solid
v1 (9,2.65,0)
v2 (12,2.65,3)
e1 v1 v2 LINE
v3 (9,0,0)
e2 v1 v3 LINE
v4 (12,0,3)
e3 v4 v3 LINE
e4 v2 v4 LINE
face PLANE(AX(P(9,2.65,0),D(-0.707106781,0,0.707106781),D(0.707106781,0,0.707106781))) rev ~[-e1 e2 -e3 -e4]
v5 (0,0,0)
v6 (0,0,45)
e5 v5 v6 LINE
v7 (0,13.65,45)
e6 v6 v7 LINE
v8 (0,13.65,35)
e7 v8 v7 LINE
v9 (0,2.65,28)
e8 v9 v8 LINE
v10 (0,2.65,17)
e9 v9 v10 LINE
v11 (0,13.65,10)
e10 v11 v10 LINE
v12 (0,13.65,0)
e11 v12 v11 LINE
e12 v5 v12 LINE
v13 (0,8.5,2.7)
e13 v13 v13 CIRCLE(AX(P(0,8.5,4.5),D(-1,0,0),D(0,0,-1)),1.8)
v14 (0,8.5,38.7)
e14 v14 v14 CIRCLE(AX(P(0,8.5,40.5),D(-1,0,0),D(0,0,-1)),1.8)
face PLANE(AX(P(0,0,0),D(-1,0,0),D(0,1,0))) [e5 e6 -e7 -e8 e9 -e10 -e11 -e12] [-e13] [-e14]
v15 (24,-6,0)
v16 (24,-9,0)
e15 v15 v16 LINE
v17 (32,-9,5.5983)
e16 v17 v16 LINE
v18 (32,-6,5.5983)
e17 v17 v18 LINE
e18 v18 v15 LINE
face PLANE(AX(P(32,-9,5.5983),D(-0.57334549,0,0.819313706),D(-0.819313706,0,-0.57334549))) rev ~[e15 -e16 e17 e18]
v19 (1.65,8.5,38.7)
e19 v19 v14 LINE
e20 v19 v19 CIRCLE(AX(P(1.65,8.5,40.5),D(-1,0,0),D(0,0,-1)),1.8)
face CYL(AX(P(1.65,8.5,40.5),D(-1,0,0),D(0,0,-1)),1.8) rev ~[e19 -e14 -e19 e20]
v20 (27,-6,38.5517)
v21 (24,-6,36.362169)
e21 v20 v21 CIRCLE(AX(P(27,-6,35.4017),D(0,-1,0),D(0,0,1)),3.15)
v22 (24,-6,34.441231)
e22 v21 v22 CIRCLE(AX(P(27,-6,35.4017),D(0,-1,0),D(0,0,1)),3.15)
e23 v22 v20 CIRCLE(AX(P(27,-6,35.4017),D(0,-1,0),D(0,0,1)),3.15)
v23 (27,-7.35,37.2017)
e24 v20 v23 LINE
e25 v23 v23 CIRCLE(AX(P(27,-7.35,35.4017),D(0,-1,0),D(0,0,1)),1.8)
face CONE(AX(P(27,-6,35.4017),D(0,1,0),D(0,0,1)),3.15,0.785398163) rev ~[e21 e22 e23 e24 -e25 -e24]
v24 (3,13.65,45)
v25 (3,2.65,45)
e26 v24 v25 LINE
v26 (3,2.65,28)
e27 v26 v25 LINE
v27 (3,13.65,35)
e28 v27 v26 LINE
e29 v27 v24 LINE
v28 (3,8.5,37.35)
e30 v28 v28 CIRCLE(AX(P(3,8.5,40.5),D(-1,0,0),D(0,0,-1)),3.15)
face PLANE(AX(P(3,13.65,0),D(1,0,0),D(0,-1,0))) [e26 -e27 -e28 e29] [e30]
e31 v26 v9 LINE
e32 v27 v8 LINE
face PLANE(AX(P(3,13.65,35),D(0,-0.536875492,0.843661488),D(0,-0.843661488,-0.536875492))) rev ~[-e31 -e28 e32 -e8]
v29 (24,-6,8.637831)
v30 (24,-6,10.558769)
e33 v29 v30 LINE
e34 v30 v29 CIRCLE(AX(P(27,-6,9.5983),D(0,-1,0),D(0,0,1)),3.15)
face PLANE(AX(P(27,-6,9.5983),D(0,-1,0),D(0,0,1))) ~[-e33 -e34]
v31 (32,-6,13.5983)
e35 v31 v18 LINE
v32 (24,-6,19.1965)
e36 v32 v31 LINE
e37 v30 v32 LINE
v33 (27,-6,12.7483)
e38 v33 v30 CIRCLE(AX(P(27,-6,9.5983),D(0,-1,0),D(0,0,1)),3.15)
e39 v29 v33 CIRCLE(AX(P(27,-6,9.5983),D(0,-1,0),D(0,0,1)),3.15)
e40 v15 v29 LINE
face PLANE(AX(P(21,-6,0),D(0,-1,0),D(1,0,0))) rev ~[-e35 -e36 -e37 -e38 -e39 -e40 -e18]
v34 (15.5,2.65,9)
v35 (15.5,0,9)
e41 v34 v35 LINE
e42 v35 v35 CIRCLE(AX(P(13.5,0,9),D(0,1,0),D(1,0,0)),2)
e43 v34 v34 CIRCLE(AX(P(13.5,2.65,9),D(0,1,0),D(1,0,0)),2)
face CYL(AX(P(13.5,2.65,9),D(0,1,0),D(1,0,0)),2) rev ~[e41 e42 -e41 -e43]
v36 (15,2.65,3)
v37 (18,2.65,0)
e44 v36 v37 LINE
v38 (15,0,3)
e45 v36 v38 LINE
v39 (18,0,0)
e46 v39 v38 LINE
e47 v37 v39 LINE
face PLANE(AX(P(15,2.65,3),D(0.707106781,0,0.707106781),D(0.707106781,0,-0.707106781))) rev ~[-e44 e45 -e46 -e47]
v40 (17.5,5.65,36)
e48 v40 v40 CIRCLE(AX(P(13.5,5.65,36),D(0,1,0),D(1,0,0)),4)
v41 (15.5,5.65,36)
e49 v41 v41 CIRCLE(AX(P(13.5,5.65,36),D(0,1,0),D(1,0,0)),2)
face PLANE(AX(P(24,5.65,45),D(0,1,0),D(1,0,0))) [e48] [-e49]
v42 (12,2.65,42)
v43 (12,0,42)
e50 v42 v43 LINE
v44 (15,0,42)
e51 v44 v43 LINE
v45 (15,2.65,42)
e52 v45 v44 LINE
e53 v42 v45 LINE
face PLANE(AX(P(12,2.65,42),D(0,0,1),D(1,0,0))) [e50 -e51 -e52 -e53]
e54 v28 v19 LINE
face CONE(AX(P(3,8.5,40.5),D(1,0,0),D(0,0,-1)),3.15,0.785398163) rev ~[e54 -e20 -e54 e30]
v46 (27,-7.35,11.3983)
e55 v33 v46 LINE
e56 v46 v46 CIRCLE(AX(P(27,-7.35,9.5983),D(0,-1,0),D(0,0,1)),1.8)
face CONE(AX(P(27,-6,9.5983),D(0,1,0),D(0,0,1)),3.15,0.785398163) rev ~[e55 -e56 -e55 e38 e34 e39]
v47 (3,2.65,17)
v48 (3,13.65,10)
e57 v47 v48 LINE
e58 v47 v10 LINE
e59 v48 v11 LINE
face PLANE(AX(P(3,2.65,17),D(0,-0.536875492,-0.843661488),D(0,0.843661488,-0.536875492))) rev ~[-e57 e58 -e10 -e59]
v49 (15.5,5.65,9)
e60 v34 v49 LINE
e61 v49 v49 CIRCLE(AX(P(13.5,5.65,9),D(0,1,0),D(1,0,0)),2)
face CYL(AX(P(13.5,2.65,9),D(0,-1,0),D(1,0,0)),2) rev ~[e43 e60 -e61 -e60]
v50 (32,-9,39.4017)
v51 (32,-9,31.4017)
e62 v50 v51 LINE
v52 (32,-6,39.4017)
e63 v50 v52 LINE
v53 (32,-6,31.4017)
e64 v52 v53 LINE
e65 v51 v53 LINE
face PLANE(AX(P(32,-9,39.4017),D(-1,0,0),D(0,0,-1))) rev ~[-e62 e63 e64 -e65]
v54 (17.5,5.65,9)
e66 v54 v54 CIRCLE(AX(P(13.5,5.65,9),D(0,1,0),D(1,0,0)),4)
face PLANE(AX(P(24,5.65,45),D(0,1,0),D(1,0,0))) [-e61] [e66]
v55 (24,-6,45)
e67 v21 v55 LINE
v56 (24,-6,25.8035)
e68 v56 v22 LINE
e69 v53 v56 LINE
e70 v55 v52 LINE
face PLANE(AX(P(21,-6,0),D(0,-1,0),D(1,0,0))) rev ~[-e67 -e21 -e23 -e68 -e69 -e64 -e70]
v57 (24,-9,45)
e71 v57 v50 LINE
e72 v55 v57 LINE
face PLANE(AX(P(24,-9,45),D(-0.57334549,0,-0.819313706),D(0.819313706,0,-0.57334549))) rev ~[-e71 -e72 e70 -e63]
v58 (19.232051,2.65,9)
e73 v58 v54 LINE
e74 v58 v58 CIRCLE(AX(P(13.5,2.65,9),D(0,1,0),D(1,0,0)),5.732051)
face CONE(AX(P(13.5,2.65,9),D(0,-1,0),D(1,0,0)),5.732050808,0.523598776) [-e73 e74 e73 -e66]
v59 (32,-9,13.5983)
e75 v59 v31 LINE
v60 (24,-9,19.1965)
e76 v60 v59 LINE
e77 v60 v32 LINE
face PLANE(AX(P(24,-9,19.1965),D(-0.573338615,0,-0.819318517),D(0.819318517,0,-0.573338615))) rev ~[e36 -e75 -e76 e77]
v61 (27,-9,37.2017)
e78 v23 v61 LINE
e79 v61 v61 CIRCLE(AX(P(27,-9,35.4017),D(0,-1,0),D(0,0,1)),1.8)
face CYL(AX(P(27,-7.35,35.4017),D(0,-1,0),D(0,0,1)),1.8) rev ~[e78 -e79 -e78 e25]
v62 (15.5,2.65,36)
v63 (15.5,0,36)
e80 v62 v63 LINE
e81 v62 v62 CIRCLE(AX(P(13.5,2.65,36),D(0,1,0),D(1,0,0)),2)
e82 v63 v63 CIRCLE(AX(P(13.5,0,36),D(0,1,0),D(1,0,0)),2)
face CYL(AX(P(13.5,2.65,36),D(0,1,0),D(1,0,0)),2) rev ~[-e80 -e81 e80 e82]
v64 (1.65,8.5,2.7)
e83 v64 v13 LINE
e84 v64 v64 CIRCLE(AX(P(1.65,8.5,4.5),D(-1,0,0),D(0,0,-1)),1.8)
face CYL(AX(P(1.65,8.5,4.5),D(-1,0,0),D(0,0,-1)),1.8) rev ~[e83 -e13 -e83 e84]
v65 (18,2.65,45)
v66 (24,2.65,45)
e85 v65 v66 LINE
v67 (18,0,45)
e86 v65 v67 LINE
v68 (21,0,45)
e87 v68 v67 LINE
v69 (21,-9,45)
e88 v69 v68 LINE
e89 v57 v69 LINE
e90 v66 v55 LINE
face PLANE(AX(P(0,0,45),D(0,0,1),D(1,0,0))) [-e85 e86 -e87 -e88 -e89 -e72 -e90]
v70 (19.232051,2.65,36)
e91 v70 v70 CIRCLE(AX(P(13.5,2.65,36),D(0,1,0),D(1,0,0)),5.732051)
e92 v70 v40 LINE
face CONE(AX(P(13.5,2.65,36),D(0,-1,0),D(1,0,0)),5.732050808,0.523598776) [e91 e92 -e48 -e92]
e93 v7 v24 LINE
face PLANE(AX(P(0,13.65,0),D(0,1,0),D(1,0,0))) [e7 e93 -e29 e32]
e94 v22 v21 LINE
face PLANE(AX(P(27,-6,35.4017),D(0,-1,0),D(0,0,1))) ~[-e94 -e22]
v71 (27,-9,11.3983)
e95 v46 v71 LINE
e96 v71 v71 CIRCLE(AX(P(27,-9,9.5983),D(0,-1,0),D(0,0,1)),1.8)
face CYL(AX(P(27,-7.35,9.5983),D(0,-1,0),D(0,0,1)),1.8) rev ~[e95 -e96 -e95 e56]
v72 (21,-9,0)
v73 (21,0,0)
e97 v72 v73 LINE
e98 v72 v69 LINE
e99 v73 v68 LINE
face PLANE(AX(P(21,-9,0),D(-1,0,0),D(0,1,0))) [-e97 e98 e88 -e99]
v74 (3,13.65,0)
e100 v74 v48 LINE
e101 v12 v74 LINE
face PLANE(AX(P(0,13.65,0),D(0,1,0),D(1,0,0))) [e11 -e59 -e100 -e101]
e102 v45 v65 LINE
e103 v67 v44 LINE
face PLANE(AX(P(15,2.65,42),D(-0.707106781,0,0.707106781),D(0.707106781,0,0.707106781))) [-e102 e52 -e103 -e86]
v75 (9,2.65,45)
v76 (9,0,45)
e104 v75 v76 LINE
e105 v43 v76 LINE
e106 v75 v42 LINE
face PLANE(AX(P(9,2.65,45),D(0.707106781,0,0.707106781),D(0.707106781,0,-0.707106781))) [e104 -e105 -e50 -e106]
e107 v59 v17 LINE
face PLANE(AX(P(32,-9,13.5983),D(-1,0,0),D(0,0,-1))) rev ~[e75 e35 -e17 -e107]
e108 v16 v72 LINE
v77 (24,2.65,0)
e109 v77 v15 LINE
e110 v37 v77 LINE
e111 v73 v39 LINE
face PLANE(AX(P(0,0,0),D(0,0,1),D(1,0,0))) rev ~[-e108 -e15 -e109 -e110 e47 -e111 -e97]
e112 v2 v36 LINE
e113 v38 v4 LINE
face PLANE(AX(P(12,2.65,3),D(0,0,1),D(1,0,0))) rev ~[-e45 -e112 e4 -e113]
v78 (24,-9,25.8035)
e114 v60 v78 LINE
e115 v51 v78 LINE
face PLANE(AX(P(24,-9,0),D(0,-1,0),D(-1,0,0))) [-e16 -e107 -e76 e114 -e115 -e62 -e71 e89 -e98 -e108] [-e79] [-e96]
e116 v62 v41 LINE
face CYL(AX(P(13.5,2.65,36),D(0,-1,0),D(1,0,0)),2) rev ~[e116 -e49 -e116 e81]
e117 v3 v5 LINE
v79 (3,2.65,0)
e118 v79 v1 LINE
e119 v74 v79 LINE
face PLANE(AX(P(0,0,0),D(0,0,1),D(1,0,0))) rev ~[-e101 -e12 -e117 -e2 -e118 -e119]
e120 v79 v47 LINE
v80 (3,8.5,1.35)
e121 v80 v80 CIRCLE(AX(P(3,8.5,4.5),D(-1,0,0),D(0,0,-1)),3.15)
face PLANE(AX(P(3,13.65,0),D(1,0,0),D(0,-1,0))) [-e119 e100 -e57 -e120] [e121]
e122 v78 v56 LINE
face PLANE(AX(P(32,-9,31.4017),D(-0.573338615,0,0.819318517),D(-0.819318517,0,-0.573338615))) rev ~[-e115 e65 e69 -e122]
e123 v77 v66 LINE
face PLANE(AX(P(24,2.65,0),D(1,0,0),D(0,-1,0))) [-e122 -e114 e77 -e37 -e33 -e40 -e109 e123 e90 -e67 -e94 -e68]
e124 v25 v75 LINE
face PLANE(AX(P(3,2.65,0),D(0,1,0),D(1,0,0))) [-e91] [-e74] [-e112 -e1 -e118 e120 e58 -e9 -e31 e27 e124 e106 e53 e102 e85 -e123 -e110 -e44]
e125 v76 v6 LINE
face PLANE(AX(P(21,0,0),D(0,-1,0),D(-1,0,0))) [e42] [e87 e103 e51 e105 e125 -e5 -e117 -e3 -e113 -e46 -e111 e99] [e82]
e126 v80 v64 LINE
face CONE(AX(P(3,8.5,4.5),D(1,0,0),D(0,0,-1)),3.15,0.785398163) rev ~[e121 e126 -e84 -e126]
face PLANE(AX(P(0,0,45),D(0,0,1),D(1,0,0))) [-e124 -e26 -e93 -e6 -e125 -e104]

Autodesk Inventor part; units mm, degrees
ref_plane "YZ Plane" through (0, 0, 0) normal (1, 0, 0) x (0, 1, 0)
ref_plane "XZ Plane" through (0, 0, 0) normal (0, 1, 0) x (-1, 0, 0)
ref_plane "XY Plane" through (0, 0, 0) normal (0, 0, 1) x (1, 0, 0)
sketch "Sketch1" plane through (0, 0, 0) normal (0, 0, 1) x (1, 0, 0)
  line L0 (3, 13.65) -> (3, 2.65)
  line L1 (3, 2.65) -> (24, 2.65)
  line L2 (24, 2.65) -> (24, -9)
  line L3 (24, -9) -> (21, -9)
  line L4 (21, -9) -> (21, 0)
  line L5 (21, 0) -> (0, 0)
  line L6 (0, 0) -> (0, 13.65)
  line L7 (0, 13.65) -> (3, 13.65)
  dimension "d0" = 2.65
  dimension "d1" = 21
  dimension "d2" = 9
  dimension "d3" = 3
  dimension "d4" = 3
  dimension "d5" = 11
extrude "Extrusion1" add sketch "Sketch1" along normal blind 45
sketch "Sketch2" plane through (3, 2.65, 0) normal (1, 0, 0) x (0, 0, -1)
  line L0 (0, 11) -> (-45, 11) projected
  line L1 (-35, 11) -> (-28, 0)
  line L2 (-17, 0) -> (-10, 11)
  line L3 (0, 0) -> (0, 11) projected
  line L4 (0, 11) -> (-45, 11) projected
  line L5 (-45, 0) -> (-45, 11) projected
  line L6 (0, 0) -> (-45, 0) projected
  point P0 (0, -2.65)
  dimension "d10" = 10
  dimension "d11" = 10
  dimension "d38" = 11
extrude "Extrusion2" cut sketch "Sketch2" against normal through all contours L2 L6 L1 L0
ref_plane "Work Plane1" through (0, 0, 22.5) normal (0, 0, 1) x (1, 0, 0)
sketch "Sketch3" plane through (3, 2.65, 0) normal (0, 1, 0) x (1, 0, 0)
  line L0 (-3, 0) -> (18, 0) projected
  line L1 (6, 0) -> (9, -3)
  line L2 (9, -3) -> (12, -3)
  line L3 (12, -3) -> (15, 0)
  line L4 (6, -45) -> (9, -42)
  line L5 (9, -42) -> (12, -42)
  line L6 (12, -42) -> (15, -45)
  line L7 (21, 0) -> (0, 0) projected
  line L8 (0, 0) -> (0, -17) projected
  line L9 (0, -17) -> (-3, -17) projected
  line L10 (-3, -28) -> (-3, -17) projected
  line L11 (0, -28) -> (-3, -28) projected
  line L12 (0, -28) -> (0, -45) projected
  line L13 (21, -45) -> (0, -45) projected
  line L14 (21, 0) -> (21, -45) projected
  point P0 (10.5, -3)
  point P1 (10.5, 0)
  point P2 (10.5, -42)
  point P3 (10.5, -45)
  dimension "d14" = 45
  dimension "d15" = 45
  dimension "d16" = 3
  dimension "d17" = 3
  dimension "d18" = 3
extrude "Extrusion3" cut sketch "Sketch3" against normal through all contours L0 L3 L2 L1 | L13 L4 L5 L6
sketch "Sketch4" plane through (3, 2.65, 45) normal (1, 0, 0) x (0, 0, -1)
  line L0 (0, 0) -> (0, 11) projected
  line L1 (45, 0) -> (45, 11) projected
  line L2 (45, 11) -> (35, 11) projected
  line L3 (10, 11) -> (0, 11) projected
  point P0 (45, -2.65)
  point P1 (40.5, 5.85)
  point P2 (4.5, 5.85)
  point P3 (0, 5.5)
  point P4 (45, 5.5)
  dimension "d21" = 4.5
  dimension "d22" = 4.5
  dimension "d46" = 5.15
hole "Hole1" at (3, 8.5, 4.5) at (3, 8.5, 40.5) direction (-1, 0, 0) diameter 3.6 end through all countersink diameter 6.3 countersink angle 90 clearance for "Flat Head Machine Screw" size "M3" standard "Ansi Metric M Profile"
sketch "Sketch5" plane through (21, -9, 0) normal (0, -1, 0) x (1, 0, 0)
  line L0 (0, 0) -> (3, 0) projected
  line L1 (3, 0) -> (3, 45) projected
  line L2 (0, 45) -> (3, 45) projected
  line L3 (0, 0) -> (0, 45) projected
  line L4 (3, 0) -> (3, 45) projected
  line L5 (3, 19.1965) -> (11, 13.5983)
  line L6 (11, 13.5983) -> (11, 5.5983)
  line L7 (11, 5.5983) -> (3, 0)
  line L8 (3, 45) -> (11, 39.4017)
  line L9 (11, 39.4017) -> (11, 31.4017)
  line L10 (11, 31.4017) -> (3, 25.8035)
  line L11 (3, 0) -> (-3, 0) projected
  line L12 (3, 45) -> (-3, 45) projected
  point P0 (-21, 0)
  point P1 (3, 22.5)
  dimension "d30" = 8
  dimension "d31" = 8
  dimension "d32" = 8
  dimension "d33" = 8
  dimension "d66" = 5.5983
  dimension "d67" = 5.5983
extrude "Extrusion4" add sketch "Sketch5" against normal blind 3 contours L1 L5 L6 L7 | L8 L9 L10 L1
sketch "Sketch6" plane through (21, -6, 0) normal (0, 1, 0) x (1, 0, 0)
  line L0 (3, -19.1965) -> (11, -13.5983) projected
  line L1 (11, -13.5983) -> (11, -5.5983) projected
  line L2 (11, -5.5983) -> (3, 0) projected
  line L3 (3, -19.1965) -> (3, 0) projected
  line L4 (3, -45) -> (11, -39.4017) projected
  line L5 (11, -39.4017) -> (11, -31.4017) projected
  line L6 (11, -31.4017) -> (3, -25.8035) projected
  line L7 (3, -19.1965) -> (3, 0) projected
  line L8 (3, -45) -> (3, -25.8035) projected
  line L9 (3, -19.1965) -> (11, -13.5983) projected
  line L10 (11, -13.5983) -> (11, -5.5983) projected
  line L11 (11, -5.5983) -> (3, 0) projected
  line L12 (3, -45) -> (11, -39.4017) projected
  line L13 (11, -39.4017) -> (11, -31.4017) projected
  line L14 (11, -31.4017) -> (3, -25.8035) projected
  line L15 (3, -45) -> (3, -25.8035) projected
  point P0 (-21, 0)
  point P1 (6, -35.4017)
  point P2 (6, -9.5983)
  point P3 (7, -16.3974)
  point P4 (7, -28.6026)
  point P5 (11, -35.4017)
  point P6 (11, -9.5983)
  dimension "d62" = 3
hole "Hole2" at (27, -6, 35.4017) at (27, -6, 9.5983) direction (0, -1, 0) diameter 3.6 end through all countersink diameter 6.3 countersink angle 90 clearance for "Flat Head Machine Screw" size "M3" standard "Ansi Metric M Profile"
sketch "Sketch7" plane through (24, 2.65, 45) normal (0, 1, 0) x (1, 0, 0)
  circle A0 centre (-10.5, 36) radius 2
  circle A1 centre (-10.5, 9) radius 2
  circle A2 centre (-10.5, 9) radius 4
  circle A3 centre (-10.5, 36) radius 4
  line L0 (-12, 3) -> (-9, 3) projected
  line L1 (-24, 17) -> (-24, 28) projected
  line L2 (-24, 22.5) -> (-9, 22.5) construction
  point P0 (-24, 45)
  point P1 (-10.5, 3)
  dimension "d48" = 4
  dimension "d49" = 13.5
  dimension "d50" = 13.5
  dimension "d51" = 8
  dimension "d61" = 27
extrude "Extrusion5" add sketch "Sketch7" along normal blind 3
extrude "Extrusion6" cut sketch "Sketch7" against normal through all contours A0 | A1
draft "FaceDraft1" angle 30 pull direction (0, 1, 0) faces at (17.487, 4.65, 36.3219) fixed edges at (9.5, 5.65, 36)
draft "FaceDraft2" angle 30 pull direction (0, 1, 0) faces at (17.487, 4.65, 9.3219) fixed edges at (9.5, 5.65, 9)
equation "\"d21\" = d22"
equation "\"d30\" = d31"
equation "\"d32\" = d31"
equation "\"d33\" = d30"
equation "\"d50\" = d49"
properties part number "ESC Mount"
